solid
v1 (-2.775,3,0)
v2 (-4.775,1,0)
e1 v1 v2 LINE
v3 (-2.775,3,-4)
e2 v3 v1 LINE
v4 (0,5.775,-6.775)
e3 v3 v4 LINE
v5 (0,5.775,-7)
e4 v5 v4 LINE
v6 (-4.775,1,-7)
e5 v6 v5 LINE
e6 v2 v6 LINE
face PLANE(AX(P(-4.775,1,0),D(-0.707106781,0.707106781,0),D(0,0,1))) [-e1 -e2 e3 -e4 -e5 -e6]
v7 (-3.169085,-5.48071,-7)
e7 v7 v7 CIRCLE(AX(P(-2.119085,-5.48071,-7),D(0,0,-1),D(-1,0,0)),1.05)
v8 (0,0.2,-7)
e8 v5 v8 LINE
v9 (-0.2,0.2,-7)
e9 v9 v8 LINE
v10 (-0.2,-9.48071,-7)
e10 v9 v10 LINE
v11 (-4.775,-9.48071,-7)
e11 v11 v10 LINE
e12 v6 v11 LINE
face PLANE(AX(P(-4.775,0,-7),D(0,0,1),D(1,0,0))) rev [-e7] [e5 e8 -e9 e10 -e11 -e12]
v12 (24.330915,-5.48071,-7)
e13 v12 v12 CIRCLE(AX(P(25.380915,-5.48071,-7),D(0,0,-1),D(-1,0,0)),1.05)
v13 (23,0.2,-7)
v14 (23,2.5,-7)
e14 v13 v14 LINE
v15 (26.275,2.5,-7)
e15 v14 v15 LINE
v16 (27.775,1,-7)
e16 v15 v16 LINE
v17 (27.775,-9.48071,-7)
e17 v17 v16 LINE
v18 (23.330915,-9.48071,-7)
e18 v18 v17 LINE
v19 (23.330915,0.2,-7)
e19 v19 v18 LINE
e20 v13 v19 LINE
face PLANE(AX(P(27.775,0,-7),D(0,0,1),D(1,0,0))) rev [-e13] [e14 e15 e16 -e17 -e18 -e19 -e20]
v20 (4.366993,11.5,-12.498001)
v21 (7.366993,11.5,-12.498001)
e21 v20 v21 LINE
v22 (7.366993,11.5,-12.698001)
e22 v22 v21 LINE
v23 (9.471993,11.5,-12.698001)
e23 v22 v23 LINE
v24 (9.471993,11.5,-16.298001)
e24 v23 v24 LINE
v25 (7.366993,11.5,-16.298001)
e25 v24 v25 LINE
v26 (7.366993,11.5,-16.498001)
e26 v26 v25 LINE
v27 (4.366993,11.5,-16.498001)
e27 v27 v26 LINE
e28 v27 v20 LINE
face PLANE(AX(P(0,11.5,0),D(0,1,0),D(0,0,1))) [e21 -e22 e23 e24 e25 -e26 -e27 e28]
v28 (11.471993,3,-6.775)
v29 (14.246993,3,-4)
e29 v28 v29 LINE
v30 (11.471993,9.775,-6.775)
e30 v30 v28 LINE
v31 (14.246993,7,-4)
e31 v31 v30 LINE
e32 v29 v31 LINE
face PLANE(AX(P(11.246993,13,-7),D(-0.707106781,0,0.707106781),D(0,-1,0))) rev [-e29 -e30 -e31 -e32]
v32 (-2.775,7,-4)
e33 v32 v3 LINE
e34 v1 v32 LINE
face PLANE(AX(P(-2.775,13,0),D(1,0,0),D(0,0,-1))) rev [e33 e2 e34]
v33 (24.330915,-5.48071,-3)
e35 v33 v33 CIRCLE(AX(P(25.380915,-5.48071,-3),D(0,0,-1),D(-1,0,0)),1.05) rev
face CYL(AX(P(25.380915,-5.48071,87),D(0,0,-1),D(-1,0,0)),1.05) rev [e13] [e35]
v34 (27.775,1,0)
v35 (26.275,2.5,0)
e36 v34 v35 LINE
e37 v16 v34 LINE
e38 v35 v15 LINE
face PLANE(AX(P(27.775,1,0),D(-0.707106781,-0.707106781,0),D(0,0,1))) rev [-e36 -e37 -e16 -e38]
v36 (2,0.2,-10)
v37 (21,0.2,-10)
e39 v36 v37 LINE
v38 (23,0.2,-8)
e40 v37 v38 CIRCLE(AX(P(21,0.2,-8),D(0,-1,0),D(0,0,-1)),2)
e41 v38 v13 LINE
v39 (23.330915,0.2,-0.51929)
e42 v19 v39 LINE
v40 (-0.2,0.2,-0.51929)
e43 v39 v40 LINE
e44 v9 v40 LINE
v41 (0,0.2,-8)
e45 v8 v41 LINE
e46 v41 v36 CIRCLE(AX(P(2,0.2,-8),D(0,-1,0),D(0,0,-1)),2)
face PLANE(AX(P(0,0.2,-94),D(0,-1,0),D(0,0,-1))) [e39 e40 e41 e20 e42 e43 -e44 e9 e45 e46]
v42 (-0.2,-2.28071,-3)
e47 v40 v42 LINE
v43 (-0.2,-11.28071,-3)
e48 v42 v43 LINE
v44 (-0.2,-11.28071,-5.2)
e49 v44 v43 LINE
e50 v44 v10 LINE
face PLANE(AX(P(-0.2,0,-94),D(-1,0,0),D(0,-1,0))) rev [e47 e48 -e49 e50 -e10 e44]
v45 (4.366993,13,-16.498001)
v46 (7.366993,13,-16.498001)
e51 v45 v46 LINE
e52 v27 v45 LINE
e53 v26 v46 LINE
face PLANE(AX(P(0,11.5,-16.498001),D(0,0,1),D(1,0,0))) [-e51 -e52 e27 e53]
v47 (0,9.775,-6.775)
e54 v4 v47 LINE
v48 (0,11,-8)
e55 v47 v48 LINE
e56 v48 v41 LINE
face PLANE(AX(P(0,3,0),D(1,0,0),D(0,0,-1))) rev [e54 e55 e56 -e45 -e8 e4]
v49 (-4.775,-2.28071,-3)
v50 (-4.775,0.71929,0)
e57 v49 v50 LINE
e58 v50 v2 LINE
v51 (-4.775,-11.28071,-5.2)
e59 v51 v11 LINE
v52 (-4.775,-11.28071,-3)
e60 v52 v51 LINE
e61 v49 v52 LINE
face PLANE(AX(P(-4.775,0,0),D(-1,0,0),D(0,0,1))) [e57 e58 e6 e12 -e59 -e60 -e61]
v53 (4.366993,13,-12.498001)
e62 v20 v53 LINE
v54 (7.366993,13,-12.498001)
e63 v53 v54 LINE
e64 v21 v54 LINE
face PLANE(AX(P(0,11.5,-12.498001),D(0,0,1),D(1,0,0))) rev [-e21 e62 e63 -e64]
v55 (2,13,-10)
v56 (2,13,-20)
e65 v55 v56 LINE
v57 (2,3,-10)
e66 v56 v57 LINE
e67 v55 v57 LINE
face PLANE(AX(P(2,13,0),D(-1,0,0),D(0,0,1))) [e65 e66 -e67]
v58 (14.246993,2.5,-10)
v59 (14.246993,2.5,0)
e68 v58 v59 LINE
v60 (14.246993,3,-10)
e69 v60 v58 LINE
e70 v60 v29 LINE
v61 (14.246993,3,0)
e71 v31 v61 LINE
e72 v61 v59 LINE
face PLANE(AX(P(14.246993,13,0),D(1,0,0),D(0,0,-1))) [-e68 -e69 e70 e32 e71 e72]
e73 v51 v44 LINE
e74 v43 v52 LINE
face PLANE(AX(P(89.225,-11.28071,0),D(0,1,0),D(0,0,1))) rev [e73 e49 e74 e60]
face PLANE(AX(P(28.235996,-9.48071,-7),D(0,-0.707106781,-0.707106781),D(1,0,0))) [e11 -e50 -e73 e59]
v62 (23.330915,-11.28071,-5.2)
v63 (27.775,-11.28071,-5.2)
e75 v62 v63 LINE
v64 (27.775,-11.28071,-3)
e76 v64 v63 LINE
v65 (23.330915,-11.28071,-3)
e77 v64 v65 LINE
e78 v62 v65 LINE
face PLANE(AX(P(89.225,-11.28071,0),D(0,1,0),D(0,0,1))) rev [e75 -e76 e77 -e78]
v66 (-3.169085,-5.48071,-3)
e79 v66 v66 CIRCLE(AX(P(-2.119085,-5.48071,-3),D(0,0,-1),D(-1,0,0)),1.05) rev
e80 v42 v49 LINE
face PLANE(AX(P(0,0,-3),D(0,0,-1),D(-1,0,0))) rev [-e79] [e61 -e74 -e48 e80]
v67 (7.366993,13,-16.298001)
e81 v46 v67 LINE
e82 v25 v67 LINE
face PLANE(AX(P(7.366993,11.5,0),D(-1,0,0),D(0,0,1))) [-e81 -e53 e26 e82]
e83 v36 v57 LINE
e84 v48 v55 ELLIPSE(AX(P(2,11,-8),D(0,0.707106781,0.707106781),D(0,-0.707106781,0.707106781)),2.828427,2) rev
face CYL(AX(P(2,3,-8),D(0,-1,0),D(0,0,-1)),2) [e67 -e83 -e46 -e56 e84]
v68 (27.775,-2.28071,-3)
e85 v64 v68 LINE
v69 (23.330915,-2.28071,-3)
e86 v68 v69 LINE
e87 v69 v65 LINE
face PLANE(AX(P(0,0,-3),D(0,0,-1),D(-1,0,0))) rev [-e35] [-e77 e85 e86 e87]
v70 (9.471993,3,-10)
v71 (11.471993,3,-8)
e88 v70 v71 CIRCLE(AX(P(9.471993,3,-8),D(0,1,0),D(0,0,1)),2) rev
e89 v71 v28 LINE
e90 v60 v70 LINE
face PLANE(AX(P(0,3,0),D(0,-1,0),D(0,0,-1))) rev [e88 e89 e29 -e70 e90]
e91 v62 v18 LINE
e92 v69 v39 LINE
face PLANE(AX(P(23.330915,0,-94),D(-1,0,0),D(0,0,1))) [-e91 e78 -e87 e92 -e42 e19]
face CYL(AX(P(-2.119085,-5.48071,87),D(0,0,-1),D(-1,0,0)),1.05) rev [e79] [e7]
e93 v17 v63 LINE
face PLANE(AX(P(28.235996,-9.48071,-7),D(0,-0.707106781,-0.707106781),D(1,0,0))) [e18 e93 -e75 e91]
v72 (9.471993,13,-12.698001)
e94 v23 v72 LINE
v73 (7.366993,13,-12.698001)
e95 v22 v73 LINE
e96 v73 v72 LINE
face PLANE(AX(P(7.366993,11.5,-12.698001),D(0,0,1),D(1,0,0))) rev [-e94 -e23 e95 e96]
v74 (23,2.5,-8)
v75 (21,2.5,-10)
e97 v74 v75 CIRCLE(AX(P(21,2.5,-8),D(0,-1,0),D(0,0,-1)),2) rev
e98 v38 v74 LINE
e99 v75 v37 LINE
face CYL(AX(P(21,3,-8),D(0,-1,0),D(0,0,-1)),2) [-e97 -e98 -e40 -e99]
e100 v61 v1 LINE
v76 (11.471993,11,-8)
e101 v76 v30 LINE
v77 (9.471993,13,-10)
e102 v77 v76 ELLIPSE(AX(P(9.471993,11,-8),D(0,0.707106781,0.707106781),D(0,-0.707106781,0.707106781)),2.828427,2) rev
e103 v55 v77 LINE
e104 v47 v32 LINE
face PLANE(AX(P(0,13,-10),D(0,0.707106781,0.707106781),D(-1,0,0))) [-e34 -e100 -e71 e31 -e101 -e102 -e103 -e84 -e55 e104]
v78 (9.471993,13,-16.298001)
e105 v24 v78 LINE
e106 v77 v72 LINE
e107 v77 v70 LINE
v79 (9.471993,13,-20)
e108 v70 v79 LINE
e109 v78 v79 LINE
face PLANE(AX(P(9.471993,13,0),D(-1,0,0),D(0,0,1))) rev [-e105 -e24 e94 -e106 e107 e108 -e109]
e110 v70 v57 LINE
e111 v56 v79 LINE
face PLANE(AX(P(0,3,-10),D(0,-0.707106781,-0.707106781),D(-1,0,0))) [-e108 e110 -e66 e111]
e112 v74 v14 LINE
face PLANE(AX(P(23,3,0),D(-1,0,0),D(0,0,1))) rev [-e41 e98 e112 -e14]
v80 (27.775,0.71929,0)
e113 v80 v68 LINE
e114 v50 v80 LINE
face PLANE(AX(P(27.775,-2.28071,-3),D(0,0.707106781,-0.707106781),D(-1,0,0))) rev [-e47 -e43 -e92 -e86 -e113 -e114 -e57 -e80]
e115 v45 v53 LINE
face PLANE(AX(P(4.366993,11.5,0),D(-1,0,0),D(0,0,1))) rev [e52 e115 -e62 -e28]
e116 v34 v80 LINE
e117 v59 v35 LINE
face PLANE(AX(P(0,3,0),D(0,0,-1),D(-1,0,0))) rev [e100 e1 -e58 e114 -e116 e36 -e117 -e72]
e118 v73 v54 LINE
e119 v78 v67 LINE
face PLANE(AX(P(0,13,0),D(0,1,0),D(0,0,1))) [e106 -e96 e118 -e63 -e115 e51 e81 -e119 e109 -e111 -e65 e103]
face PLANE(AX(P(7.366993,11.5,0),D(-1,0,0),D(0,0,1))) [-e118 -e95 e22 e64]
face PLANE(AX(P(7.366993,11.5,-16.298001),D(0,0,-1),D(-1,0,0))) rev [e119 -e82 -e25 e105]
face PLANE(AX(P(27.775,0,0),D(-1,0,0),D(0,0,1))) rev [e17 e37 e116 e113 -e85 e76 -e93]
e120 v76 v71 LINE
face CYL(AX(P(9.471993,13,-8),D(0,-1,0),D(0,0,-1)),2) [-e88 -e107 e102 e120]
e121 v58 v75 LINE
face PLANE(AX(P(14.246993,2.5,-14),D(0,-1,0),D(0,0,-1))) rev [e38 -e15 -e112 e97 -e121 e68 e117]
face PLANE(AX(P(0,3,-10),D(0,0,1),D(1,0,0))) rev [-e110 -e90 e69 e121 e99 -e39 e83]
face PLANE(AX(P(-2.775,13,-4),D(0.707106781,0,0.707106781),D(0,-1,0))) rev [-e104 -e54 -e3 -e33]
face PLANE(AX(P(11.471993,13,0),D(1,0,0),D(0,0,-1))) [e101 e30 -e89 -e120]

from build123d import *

# Parameters (mm, degrees)
SKETCH1_W             = 23
SKETCH1_H             = 10
BOSS_EXTRUDE1_DEPTH   = 3
SKETCH2_W             = 7
SKETCH2_H             = 3
BOSS_EXTRUDE2_DEPTH   = 4.775
SKETCH3_W             = 7
SKETCH3_H             = 3
BOSS_EXTRUDE3_DEPTH   = 4.775
BOSS_EXTRUDE4_START   = -4.775
BOSS_EXTRUDE4_DEPTH   = 4.775
BOSS_EXTRUDE4_START_2 = 23.130914758
BOSS_EXTRUDE4_2_DEPTH = 4.644085242
SKETCH5_W             = 6.593837141
SKETCH5_H             = 7.601131285
CUT_EXTRUDE1_DEPTH    = 94
CUT_EXTRUDE2_DEPTH    = 94
SKETCH7_R             = 1.05
CUT_EXTRUDE3_DEPTH    = 94
FILLET1_R             = 2
CHAMFER2_SIZE         = 2
CHAMFER3_SIZE         = 2
BOSS_EXTRUDE5_START   = 10
SKETCH8_W             = 3.735996303
SKETCH8_H             = 10
BOSS_EXTRUDE5_DEPTH   = 10
SKETCH10_W            = 1.630996303
SKETCH10_H            = 4
SKETCH10_W_2          = 0.412454303
SKETCH10_H_2          = 2
CUT_EXTRUDE5_DEPTH    = 1.5
SKETCH11_W            = 2.105
SKETCH11_H            = 3.6
CUT_EXTRUDE6_DEPTH    = 1.5
SKETCH14_W            = 12.528007394
SKETCH14_H            = 0.5
CUT_EXTRUDE9_DEPTH    = 14
CHAMFER4_SIZE         = 10
CHAMFER5_SIZE         = 10
CHAMFER6_SIZE         = 3
SKETCH12_W            = 32.55
SKETCH12_H            = 6
CUT_EXTRUDE7_DEPTH    = 3
SKETCH13_W            = 32.55
SKETCH13_H            = 3
CUT_EXTRUDE8_DEPTH    = 3
CHAMFER7_SIZE         = 3


# Read off the part's stored shape, not the designer's step: Boss-Extrude4
# Some blends are built 0.0001 mm under size
with BuildPart() as part:
    # Sketch1 → Boss-Extrude1 (new body)
    with BuildSketch(Plane(origin=(0, 0, 0), x_dir=(1, 0, 0), z_dir=(0, 1, 0))):
        with Locations((11.5, 5)):
            Rectangle(SKETCH1_W, SKETCH1_H)
    extrude(amount=BOSS_EXTRUDE1_DEPTH)

    # Sketch2 → Boss-Extrude2 (add)
    with BuildSketch(Plane(origin=(23, 0, 0), x_dir=(0, 0, -1), z_dir=(1, 0, 0))):
        with Locations((3.5, 1.5)):
            Rectangle(SKETCH2_W, SKETCH2_H)
    extrude(amount=BOSS_EXTRUDE2_DEPTH)

    # Sketch3 → Boss-Extrude3 (add)
    with BuildSketch(Plane.ZY):
        with Locations((-3.5, 1.5)):
            Rectangle(SKETCH3_W, SKETCH3_H)
    extrude(amount=BOSS_EXTRUDE3_DEPTH)

    # Boss-Extrude4 outline → Boss-Extrude4 (add)
    with BuildSketch(Plane.YZ.offset(BOSS_EXTRUDE4_START)):
        Polygon((0, 0), (-16.48071009, 0), (-9.48071009, -7), (0, -7), align=None)
    extrude(amount=BOSS_EXTRUDE4_DEPTH)

    # Boss-Extrude4 2 outline → Boss-Extrude4 2 (add)
    with BuildSketch(Plane.YZ.offset(BOSS_EXTRUDE4_START_2)):
        Polygon((0, 0), (-16.48071009, 0), (-9.48071009, -7), (0, -7), align=None)
    extrude(amount=BOSS_EXTRUDE4_2_DEPTH)

    # Sketch5 → Cut-Extrude1 (cut)
    with BuildSketch(Plane.ZY.offset(4.775)):
        with Locations((-3.296918571, -15.081275732)):
            Rectangle(SKETCH5_W, SKETCH5_H)
    extrude(amount=-CUT_EXTRUDE1_DEPTH, mode=Mode.SUBTRACT)

    # Sketch6 → Cut-Extrude2 (cut)
    with BuildSketch(Plane.XY):
        Polygon((23.330914758, 0.2), (-0.2, 0.2), (-0.2, -11.28071009), (0, -11.28071009), (0, 0), (23.130914758, 0), (23.130914758, -11.28071009), (23.330914758, -11.28071009), align=None)
    extrude(amount=-CUT_EXTRUDE2_DEPTH, mode=Mode.SUBTRACT)

    # Sketch7 → Cut-Extrude3 (cut)
    with BuildSketch(Plane(origin=(0, 0, -7), x_dir=(-1, 0, 0), z_dir=(0, 0, -1))):
        with Locations((2.119085242, -5.48071009)):
            Circle(SKETCH7_R)
        with Locations((-25.380914758, -5.48071009)):
            Circle(SKETCH7_R)
    extrude(amount=-CUT_EXTRUDE3_DEPTH, mode=Mode.SUBTRACT)

    # Fillet1
    fillet1_edges = [part.edges().sort_by_distance(p)[0] for p in [
        (0, 1.6, -10),
        (23, 1.6, -10),
    ]]
    fillet(fillet1_edges, radius=FILLET1_R)

    # Chamfer2
    chamfer2_edges = [part.edges().sort_by_distance(p)[0] for p in [
        (27.775, 3, -3.5),
        (-4.775, 3, -3.5),
    ]]
    chamfer(chamfer2_edges, length=CHAMFER2_SIZE)

    # Chamfer3
    chamfer3_edges = [part.edges().sort_by_distance(p)[0] for p in [
        (25.552957379, -11.28071009, 0),
    ]]
    chamfer(chamfer3_edges, length=CHAMFER3_SIZE)

    # Sketch8 → Boss-Extrude5 (add)
    with BuildSketch(Plane(origin=(0, 3, 0), x_dir=(1, 0, 0), z_dir=(0, 1, 0)).offset(BOSS_EXTRUDE5_START)):
        with BuildLine():
            Line((9.471992606, 10), (5.735996303, 10))
            Line((5.735996303, 10), (5.735996303, 0))
            Line((5.735996303, 0), (14.246992606, 0))
            Line((14.246992606, 0), (14.246992606, 7))
            Line((14.246992606, 7), (11.471992606, 7))
            Line((11.471992606, 7), (11.471992606, 8))
            ThreePointArc((11.471992606, 8), (10.886206168, 9.414213562), (9.471992606, 10))
        make_face()
        with BuildLine():
            Line((5.735996303, 0), (5.735996303, 10))
            Line((5.735996303, 10), (2, 10))
            ThreePointArc((2, 10), (0.585786438, 9.414213562), (0, 8))
            Line((0, 8), (0, 7))
            Line((0, 7), (-2.775, 7))
            Line((-2.775, 7), (-2.775, 0))
            Line((-2.775, 0), (5.735996303, 0))
        make_face()
        with Locations((3.867998152, 15)):
            Rectangle(SKETCH8_W, SKETCH8_H)
        with Locations((7.603994455, 15)):
            Rectangle(SKETCH8_W, SKETCH8_H)
    extrude(amount=-BOSS_EXTRUDE5_DEPTH)

    # Sketch10 → Cut-Extrude5 (cut)
    with BuildSketch(Plane(origin=(0, 13, 0), x_dir=(1, 0, 0), z_dir=(0, 1, 0))):
        with Locations((6.551494455, 14.49800095)):
            Rectangle(SKETCH10_W, SKETCH10_H)
        with Locations((4.573219758, 13.49800095)):
            Rectangle(SKETCH10_W_2, SKETCH10_H_2)
        with Locations((4.573219758, 15.49800095)):
            Rectangle(SKETCH10_W_2, SKETCH10_H_2)
        Polygon((5.735996303, 16.49800095), (4.779446909, 16.49800095), (4.779446909, 14.49800095), (4.779446909, 12.49800095), (5.735996303, 12.49800095), align=None)
    extrude(amount=-CUT_EXTRUDE5_DEPTH, mode=Mode.SUBTRACT)

    # Sketch11 → Cut-Extrude6 (cut)
    with BuildSketch(Plane(origin=(0, 13, 0), x_dir=(1, 0, 0), z_dir=(0, 1, 0))):
        with Locations((8.419492606, 14.49800095)):
            Rectangle(SKETCH11_W, SKETCH11_H)
    extrude(amount=-CUT_EXTRUDE6_DEPTH, mode=Mode.SUBTRACT)

    # Sketch14 → Cut-Extrude9 (cut)
    with BuildSketch(Plane.XY):
        with Locations((20.510996303, 2.75)):
            Rectangle(SKETCH14_W, SKETCH14_H)
    extrude(amount=-CUT_EXTRUDE9_DEPTH, mode=Mode.SUBTRACT)

    # Chamfer4
    chamfer4_edges = [part.edges().sort_by_distance(p)[0] for p in [
        (5.735996303, 3, -20),
    ]]
    chamfer(chamfer4_edges, length=CHAMFER4_SIZE - 0.0001)  # a hair under: the kernel refuses the full size

    # Chamfer5
    chamfer5_edges = [part.edges().sort_by_distance(p)[0] for p in [
        (5.735996303, 13, 0),
    ]]
    chamfer(chamfer5_edges, length=CHAMFER5_SIZE)

    # Chamfer6
    # the kernel refuses this chamfer: 3 mm, written as the material it takes off along each edge
    with BuildSketch(Plane(origin=(-2.775, 17.715048964, -7), x_dir=(0.9996219169112968, 0, -0.02749587661058649), z_dir=(0, -1, 0))) as chamfer6_piece_1_section:
        Polygon((CHAMFER6_SIZE * 0.999621916911, CHAMFER6_SIZE * 0.0274958766106), (-CHAMFER6_SIZE * 0.0274958766106, CHAMFER6_SIZE * 0.999621916911), (0, 0), align=None)
    chamfer6_piece_1 = extrude(amount=22.430097928, mode=Mode.PRIVATE)
    chamfer6_piece_1 = split(chamfer6_piece_1, bisect_by=Plane(origin=(0, 7.74942321, -6.834490118), z_dir=(-1, 0, 0)), keep=Keep.TOP, mode=Mode.PRIVATE)
    chamfer6_piece_1 = split(chamfer6_piece_1, bisect_by=Plane(origin=(0.931889756, 6.706889756, -6.834490118), z_dir=(-0.7071067811865476, 0.7071067811865476, 0)), keep=Keep.TOP, mode=Mode.PRIVATE)
    add(chamfer6_piece_1, mode=Mode.SUBTRACT)
    with BuildSketch(Plane(origin=(14.246992606, 17.715048964, -7), x_dir=(-0.9996219169112969, 0, -0.027495876610586497), z_dir=(0, -1, 0))) as chamfer6_piece_2_section:
        Polygon((CHAMFER6_SIZE * 0.999621916911, -CHAMFER6_SIZE * 0.0274958766106), (-CHAMFER6_SIZE * 0.0274958766106, -CHAMFER6_SIZE * 0.999621916911), (0, 0), align=None)
    chamfer6_piece_2 = extrude(amount=14.715048964, mode=Mode.PRIVATE)
    chamfer6_piece_2 = split(chamfer6_piece_2, bisect_by=Plane(origin=(11.471992606, 6.038915357, -6.077830715), z_dir=(1, 0, 0)), keep=Keep.TOP, mode=Mode.PRIVATE)
    add(chamfer6_piece_2, mode=Mode.SUBTRACT)

    # Sketch12 → Cut-Extrude7 (cut)
    with BuildSketch(Plane.XY):
        with Locations((11.5, -5.28071009)):
            Rectangle(SKETCH12_W, SKETCH12_H)
    extrude(amount=-CUT_EXTRUDE7_DEPTH, mode=Mode.SUBTRACT)

    # Sketch13 → Cut-Extrude8 (cut)
    with BuildSketch(Plane(origin=(0, -8.28071009, 0), x_dir=(1, 0, 0), z_dir=(0, 1, 0))):
        with Locations((11.5, 1.5)):
            Rectangle(SKETCH13_W, SKETCH13_H)
    extrude(amount=-CUT_EXTRUDE8_DEPTH, mode=Mode.SUBTRACT)

    # Chamfer7
    chamfer7_edges = [part.edges().sort_by_distance(p)[0] for p in [
        (25.552957379, -2.28071009, 0),
    ]]
    chamfer(chamfer7_edges, length=CHAMFER7_SIZE - 0.0001)  # a hair under: the kernel refuses the full size


solid = part.part
